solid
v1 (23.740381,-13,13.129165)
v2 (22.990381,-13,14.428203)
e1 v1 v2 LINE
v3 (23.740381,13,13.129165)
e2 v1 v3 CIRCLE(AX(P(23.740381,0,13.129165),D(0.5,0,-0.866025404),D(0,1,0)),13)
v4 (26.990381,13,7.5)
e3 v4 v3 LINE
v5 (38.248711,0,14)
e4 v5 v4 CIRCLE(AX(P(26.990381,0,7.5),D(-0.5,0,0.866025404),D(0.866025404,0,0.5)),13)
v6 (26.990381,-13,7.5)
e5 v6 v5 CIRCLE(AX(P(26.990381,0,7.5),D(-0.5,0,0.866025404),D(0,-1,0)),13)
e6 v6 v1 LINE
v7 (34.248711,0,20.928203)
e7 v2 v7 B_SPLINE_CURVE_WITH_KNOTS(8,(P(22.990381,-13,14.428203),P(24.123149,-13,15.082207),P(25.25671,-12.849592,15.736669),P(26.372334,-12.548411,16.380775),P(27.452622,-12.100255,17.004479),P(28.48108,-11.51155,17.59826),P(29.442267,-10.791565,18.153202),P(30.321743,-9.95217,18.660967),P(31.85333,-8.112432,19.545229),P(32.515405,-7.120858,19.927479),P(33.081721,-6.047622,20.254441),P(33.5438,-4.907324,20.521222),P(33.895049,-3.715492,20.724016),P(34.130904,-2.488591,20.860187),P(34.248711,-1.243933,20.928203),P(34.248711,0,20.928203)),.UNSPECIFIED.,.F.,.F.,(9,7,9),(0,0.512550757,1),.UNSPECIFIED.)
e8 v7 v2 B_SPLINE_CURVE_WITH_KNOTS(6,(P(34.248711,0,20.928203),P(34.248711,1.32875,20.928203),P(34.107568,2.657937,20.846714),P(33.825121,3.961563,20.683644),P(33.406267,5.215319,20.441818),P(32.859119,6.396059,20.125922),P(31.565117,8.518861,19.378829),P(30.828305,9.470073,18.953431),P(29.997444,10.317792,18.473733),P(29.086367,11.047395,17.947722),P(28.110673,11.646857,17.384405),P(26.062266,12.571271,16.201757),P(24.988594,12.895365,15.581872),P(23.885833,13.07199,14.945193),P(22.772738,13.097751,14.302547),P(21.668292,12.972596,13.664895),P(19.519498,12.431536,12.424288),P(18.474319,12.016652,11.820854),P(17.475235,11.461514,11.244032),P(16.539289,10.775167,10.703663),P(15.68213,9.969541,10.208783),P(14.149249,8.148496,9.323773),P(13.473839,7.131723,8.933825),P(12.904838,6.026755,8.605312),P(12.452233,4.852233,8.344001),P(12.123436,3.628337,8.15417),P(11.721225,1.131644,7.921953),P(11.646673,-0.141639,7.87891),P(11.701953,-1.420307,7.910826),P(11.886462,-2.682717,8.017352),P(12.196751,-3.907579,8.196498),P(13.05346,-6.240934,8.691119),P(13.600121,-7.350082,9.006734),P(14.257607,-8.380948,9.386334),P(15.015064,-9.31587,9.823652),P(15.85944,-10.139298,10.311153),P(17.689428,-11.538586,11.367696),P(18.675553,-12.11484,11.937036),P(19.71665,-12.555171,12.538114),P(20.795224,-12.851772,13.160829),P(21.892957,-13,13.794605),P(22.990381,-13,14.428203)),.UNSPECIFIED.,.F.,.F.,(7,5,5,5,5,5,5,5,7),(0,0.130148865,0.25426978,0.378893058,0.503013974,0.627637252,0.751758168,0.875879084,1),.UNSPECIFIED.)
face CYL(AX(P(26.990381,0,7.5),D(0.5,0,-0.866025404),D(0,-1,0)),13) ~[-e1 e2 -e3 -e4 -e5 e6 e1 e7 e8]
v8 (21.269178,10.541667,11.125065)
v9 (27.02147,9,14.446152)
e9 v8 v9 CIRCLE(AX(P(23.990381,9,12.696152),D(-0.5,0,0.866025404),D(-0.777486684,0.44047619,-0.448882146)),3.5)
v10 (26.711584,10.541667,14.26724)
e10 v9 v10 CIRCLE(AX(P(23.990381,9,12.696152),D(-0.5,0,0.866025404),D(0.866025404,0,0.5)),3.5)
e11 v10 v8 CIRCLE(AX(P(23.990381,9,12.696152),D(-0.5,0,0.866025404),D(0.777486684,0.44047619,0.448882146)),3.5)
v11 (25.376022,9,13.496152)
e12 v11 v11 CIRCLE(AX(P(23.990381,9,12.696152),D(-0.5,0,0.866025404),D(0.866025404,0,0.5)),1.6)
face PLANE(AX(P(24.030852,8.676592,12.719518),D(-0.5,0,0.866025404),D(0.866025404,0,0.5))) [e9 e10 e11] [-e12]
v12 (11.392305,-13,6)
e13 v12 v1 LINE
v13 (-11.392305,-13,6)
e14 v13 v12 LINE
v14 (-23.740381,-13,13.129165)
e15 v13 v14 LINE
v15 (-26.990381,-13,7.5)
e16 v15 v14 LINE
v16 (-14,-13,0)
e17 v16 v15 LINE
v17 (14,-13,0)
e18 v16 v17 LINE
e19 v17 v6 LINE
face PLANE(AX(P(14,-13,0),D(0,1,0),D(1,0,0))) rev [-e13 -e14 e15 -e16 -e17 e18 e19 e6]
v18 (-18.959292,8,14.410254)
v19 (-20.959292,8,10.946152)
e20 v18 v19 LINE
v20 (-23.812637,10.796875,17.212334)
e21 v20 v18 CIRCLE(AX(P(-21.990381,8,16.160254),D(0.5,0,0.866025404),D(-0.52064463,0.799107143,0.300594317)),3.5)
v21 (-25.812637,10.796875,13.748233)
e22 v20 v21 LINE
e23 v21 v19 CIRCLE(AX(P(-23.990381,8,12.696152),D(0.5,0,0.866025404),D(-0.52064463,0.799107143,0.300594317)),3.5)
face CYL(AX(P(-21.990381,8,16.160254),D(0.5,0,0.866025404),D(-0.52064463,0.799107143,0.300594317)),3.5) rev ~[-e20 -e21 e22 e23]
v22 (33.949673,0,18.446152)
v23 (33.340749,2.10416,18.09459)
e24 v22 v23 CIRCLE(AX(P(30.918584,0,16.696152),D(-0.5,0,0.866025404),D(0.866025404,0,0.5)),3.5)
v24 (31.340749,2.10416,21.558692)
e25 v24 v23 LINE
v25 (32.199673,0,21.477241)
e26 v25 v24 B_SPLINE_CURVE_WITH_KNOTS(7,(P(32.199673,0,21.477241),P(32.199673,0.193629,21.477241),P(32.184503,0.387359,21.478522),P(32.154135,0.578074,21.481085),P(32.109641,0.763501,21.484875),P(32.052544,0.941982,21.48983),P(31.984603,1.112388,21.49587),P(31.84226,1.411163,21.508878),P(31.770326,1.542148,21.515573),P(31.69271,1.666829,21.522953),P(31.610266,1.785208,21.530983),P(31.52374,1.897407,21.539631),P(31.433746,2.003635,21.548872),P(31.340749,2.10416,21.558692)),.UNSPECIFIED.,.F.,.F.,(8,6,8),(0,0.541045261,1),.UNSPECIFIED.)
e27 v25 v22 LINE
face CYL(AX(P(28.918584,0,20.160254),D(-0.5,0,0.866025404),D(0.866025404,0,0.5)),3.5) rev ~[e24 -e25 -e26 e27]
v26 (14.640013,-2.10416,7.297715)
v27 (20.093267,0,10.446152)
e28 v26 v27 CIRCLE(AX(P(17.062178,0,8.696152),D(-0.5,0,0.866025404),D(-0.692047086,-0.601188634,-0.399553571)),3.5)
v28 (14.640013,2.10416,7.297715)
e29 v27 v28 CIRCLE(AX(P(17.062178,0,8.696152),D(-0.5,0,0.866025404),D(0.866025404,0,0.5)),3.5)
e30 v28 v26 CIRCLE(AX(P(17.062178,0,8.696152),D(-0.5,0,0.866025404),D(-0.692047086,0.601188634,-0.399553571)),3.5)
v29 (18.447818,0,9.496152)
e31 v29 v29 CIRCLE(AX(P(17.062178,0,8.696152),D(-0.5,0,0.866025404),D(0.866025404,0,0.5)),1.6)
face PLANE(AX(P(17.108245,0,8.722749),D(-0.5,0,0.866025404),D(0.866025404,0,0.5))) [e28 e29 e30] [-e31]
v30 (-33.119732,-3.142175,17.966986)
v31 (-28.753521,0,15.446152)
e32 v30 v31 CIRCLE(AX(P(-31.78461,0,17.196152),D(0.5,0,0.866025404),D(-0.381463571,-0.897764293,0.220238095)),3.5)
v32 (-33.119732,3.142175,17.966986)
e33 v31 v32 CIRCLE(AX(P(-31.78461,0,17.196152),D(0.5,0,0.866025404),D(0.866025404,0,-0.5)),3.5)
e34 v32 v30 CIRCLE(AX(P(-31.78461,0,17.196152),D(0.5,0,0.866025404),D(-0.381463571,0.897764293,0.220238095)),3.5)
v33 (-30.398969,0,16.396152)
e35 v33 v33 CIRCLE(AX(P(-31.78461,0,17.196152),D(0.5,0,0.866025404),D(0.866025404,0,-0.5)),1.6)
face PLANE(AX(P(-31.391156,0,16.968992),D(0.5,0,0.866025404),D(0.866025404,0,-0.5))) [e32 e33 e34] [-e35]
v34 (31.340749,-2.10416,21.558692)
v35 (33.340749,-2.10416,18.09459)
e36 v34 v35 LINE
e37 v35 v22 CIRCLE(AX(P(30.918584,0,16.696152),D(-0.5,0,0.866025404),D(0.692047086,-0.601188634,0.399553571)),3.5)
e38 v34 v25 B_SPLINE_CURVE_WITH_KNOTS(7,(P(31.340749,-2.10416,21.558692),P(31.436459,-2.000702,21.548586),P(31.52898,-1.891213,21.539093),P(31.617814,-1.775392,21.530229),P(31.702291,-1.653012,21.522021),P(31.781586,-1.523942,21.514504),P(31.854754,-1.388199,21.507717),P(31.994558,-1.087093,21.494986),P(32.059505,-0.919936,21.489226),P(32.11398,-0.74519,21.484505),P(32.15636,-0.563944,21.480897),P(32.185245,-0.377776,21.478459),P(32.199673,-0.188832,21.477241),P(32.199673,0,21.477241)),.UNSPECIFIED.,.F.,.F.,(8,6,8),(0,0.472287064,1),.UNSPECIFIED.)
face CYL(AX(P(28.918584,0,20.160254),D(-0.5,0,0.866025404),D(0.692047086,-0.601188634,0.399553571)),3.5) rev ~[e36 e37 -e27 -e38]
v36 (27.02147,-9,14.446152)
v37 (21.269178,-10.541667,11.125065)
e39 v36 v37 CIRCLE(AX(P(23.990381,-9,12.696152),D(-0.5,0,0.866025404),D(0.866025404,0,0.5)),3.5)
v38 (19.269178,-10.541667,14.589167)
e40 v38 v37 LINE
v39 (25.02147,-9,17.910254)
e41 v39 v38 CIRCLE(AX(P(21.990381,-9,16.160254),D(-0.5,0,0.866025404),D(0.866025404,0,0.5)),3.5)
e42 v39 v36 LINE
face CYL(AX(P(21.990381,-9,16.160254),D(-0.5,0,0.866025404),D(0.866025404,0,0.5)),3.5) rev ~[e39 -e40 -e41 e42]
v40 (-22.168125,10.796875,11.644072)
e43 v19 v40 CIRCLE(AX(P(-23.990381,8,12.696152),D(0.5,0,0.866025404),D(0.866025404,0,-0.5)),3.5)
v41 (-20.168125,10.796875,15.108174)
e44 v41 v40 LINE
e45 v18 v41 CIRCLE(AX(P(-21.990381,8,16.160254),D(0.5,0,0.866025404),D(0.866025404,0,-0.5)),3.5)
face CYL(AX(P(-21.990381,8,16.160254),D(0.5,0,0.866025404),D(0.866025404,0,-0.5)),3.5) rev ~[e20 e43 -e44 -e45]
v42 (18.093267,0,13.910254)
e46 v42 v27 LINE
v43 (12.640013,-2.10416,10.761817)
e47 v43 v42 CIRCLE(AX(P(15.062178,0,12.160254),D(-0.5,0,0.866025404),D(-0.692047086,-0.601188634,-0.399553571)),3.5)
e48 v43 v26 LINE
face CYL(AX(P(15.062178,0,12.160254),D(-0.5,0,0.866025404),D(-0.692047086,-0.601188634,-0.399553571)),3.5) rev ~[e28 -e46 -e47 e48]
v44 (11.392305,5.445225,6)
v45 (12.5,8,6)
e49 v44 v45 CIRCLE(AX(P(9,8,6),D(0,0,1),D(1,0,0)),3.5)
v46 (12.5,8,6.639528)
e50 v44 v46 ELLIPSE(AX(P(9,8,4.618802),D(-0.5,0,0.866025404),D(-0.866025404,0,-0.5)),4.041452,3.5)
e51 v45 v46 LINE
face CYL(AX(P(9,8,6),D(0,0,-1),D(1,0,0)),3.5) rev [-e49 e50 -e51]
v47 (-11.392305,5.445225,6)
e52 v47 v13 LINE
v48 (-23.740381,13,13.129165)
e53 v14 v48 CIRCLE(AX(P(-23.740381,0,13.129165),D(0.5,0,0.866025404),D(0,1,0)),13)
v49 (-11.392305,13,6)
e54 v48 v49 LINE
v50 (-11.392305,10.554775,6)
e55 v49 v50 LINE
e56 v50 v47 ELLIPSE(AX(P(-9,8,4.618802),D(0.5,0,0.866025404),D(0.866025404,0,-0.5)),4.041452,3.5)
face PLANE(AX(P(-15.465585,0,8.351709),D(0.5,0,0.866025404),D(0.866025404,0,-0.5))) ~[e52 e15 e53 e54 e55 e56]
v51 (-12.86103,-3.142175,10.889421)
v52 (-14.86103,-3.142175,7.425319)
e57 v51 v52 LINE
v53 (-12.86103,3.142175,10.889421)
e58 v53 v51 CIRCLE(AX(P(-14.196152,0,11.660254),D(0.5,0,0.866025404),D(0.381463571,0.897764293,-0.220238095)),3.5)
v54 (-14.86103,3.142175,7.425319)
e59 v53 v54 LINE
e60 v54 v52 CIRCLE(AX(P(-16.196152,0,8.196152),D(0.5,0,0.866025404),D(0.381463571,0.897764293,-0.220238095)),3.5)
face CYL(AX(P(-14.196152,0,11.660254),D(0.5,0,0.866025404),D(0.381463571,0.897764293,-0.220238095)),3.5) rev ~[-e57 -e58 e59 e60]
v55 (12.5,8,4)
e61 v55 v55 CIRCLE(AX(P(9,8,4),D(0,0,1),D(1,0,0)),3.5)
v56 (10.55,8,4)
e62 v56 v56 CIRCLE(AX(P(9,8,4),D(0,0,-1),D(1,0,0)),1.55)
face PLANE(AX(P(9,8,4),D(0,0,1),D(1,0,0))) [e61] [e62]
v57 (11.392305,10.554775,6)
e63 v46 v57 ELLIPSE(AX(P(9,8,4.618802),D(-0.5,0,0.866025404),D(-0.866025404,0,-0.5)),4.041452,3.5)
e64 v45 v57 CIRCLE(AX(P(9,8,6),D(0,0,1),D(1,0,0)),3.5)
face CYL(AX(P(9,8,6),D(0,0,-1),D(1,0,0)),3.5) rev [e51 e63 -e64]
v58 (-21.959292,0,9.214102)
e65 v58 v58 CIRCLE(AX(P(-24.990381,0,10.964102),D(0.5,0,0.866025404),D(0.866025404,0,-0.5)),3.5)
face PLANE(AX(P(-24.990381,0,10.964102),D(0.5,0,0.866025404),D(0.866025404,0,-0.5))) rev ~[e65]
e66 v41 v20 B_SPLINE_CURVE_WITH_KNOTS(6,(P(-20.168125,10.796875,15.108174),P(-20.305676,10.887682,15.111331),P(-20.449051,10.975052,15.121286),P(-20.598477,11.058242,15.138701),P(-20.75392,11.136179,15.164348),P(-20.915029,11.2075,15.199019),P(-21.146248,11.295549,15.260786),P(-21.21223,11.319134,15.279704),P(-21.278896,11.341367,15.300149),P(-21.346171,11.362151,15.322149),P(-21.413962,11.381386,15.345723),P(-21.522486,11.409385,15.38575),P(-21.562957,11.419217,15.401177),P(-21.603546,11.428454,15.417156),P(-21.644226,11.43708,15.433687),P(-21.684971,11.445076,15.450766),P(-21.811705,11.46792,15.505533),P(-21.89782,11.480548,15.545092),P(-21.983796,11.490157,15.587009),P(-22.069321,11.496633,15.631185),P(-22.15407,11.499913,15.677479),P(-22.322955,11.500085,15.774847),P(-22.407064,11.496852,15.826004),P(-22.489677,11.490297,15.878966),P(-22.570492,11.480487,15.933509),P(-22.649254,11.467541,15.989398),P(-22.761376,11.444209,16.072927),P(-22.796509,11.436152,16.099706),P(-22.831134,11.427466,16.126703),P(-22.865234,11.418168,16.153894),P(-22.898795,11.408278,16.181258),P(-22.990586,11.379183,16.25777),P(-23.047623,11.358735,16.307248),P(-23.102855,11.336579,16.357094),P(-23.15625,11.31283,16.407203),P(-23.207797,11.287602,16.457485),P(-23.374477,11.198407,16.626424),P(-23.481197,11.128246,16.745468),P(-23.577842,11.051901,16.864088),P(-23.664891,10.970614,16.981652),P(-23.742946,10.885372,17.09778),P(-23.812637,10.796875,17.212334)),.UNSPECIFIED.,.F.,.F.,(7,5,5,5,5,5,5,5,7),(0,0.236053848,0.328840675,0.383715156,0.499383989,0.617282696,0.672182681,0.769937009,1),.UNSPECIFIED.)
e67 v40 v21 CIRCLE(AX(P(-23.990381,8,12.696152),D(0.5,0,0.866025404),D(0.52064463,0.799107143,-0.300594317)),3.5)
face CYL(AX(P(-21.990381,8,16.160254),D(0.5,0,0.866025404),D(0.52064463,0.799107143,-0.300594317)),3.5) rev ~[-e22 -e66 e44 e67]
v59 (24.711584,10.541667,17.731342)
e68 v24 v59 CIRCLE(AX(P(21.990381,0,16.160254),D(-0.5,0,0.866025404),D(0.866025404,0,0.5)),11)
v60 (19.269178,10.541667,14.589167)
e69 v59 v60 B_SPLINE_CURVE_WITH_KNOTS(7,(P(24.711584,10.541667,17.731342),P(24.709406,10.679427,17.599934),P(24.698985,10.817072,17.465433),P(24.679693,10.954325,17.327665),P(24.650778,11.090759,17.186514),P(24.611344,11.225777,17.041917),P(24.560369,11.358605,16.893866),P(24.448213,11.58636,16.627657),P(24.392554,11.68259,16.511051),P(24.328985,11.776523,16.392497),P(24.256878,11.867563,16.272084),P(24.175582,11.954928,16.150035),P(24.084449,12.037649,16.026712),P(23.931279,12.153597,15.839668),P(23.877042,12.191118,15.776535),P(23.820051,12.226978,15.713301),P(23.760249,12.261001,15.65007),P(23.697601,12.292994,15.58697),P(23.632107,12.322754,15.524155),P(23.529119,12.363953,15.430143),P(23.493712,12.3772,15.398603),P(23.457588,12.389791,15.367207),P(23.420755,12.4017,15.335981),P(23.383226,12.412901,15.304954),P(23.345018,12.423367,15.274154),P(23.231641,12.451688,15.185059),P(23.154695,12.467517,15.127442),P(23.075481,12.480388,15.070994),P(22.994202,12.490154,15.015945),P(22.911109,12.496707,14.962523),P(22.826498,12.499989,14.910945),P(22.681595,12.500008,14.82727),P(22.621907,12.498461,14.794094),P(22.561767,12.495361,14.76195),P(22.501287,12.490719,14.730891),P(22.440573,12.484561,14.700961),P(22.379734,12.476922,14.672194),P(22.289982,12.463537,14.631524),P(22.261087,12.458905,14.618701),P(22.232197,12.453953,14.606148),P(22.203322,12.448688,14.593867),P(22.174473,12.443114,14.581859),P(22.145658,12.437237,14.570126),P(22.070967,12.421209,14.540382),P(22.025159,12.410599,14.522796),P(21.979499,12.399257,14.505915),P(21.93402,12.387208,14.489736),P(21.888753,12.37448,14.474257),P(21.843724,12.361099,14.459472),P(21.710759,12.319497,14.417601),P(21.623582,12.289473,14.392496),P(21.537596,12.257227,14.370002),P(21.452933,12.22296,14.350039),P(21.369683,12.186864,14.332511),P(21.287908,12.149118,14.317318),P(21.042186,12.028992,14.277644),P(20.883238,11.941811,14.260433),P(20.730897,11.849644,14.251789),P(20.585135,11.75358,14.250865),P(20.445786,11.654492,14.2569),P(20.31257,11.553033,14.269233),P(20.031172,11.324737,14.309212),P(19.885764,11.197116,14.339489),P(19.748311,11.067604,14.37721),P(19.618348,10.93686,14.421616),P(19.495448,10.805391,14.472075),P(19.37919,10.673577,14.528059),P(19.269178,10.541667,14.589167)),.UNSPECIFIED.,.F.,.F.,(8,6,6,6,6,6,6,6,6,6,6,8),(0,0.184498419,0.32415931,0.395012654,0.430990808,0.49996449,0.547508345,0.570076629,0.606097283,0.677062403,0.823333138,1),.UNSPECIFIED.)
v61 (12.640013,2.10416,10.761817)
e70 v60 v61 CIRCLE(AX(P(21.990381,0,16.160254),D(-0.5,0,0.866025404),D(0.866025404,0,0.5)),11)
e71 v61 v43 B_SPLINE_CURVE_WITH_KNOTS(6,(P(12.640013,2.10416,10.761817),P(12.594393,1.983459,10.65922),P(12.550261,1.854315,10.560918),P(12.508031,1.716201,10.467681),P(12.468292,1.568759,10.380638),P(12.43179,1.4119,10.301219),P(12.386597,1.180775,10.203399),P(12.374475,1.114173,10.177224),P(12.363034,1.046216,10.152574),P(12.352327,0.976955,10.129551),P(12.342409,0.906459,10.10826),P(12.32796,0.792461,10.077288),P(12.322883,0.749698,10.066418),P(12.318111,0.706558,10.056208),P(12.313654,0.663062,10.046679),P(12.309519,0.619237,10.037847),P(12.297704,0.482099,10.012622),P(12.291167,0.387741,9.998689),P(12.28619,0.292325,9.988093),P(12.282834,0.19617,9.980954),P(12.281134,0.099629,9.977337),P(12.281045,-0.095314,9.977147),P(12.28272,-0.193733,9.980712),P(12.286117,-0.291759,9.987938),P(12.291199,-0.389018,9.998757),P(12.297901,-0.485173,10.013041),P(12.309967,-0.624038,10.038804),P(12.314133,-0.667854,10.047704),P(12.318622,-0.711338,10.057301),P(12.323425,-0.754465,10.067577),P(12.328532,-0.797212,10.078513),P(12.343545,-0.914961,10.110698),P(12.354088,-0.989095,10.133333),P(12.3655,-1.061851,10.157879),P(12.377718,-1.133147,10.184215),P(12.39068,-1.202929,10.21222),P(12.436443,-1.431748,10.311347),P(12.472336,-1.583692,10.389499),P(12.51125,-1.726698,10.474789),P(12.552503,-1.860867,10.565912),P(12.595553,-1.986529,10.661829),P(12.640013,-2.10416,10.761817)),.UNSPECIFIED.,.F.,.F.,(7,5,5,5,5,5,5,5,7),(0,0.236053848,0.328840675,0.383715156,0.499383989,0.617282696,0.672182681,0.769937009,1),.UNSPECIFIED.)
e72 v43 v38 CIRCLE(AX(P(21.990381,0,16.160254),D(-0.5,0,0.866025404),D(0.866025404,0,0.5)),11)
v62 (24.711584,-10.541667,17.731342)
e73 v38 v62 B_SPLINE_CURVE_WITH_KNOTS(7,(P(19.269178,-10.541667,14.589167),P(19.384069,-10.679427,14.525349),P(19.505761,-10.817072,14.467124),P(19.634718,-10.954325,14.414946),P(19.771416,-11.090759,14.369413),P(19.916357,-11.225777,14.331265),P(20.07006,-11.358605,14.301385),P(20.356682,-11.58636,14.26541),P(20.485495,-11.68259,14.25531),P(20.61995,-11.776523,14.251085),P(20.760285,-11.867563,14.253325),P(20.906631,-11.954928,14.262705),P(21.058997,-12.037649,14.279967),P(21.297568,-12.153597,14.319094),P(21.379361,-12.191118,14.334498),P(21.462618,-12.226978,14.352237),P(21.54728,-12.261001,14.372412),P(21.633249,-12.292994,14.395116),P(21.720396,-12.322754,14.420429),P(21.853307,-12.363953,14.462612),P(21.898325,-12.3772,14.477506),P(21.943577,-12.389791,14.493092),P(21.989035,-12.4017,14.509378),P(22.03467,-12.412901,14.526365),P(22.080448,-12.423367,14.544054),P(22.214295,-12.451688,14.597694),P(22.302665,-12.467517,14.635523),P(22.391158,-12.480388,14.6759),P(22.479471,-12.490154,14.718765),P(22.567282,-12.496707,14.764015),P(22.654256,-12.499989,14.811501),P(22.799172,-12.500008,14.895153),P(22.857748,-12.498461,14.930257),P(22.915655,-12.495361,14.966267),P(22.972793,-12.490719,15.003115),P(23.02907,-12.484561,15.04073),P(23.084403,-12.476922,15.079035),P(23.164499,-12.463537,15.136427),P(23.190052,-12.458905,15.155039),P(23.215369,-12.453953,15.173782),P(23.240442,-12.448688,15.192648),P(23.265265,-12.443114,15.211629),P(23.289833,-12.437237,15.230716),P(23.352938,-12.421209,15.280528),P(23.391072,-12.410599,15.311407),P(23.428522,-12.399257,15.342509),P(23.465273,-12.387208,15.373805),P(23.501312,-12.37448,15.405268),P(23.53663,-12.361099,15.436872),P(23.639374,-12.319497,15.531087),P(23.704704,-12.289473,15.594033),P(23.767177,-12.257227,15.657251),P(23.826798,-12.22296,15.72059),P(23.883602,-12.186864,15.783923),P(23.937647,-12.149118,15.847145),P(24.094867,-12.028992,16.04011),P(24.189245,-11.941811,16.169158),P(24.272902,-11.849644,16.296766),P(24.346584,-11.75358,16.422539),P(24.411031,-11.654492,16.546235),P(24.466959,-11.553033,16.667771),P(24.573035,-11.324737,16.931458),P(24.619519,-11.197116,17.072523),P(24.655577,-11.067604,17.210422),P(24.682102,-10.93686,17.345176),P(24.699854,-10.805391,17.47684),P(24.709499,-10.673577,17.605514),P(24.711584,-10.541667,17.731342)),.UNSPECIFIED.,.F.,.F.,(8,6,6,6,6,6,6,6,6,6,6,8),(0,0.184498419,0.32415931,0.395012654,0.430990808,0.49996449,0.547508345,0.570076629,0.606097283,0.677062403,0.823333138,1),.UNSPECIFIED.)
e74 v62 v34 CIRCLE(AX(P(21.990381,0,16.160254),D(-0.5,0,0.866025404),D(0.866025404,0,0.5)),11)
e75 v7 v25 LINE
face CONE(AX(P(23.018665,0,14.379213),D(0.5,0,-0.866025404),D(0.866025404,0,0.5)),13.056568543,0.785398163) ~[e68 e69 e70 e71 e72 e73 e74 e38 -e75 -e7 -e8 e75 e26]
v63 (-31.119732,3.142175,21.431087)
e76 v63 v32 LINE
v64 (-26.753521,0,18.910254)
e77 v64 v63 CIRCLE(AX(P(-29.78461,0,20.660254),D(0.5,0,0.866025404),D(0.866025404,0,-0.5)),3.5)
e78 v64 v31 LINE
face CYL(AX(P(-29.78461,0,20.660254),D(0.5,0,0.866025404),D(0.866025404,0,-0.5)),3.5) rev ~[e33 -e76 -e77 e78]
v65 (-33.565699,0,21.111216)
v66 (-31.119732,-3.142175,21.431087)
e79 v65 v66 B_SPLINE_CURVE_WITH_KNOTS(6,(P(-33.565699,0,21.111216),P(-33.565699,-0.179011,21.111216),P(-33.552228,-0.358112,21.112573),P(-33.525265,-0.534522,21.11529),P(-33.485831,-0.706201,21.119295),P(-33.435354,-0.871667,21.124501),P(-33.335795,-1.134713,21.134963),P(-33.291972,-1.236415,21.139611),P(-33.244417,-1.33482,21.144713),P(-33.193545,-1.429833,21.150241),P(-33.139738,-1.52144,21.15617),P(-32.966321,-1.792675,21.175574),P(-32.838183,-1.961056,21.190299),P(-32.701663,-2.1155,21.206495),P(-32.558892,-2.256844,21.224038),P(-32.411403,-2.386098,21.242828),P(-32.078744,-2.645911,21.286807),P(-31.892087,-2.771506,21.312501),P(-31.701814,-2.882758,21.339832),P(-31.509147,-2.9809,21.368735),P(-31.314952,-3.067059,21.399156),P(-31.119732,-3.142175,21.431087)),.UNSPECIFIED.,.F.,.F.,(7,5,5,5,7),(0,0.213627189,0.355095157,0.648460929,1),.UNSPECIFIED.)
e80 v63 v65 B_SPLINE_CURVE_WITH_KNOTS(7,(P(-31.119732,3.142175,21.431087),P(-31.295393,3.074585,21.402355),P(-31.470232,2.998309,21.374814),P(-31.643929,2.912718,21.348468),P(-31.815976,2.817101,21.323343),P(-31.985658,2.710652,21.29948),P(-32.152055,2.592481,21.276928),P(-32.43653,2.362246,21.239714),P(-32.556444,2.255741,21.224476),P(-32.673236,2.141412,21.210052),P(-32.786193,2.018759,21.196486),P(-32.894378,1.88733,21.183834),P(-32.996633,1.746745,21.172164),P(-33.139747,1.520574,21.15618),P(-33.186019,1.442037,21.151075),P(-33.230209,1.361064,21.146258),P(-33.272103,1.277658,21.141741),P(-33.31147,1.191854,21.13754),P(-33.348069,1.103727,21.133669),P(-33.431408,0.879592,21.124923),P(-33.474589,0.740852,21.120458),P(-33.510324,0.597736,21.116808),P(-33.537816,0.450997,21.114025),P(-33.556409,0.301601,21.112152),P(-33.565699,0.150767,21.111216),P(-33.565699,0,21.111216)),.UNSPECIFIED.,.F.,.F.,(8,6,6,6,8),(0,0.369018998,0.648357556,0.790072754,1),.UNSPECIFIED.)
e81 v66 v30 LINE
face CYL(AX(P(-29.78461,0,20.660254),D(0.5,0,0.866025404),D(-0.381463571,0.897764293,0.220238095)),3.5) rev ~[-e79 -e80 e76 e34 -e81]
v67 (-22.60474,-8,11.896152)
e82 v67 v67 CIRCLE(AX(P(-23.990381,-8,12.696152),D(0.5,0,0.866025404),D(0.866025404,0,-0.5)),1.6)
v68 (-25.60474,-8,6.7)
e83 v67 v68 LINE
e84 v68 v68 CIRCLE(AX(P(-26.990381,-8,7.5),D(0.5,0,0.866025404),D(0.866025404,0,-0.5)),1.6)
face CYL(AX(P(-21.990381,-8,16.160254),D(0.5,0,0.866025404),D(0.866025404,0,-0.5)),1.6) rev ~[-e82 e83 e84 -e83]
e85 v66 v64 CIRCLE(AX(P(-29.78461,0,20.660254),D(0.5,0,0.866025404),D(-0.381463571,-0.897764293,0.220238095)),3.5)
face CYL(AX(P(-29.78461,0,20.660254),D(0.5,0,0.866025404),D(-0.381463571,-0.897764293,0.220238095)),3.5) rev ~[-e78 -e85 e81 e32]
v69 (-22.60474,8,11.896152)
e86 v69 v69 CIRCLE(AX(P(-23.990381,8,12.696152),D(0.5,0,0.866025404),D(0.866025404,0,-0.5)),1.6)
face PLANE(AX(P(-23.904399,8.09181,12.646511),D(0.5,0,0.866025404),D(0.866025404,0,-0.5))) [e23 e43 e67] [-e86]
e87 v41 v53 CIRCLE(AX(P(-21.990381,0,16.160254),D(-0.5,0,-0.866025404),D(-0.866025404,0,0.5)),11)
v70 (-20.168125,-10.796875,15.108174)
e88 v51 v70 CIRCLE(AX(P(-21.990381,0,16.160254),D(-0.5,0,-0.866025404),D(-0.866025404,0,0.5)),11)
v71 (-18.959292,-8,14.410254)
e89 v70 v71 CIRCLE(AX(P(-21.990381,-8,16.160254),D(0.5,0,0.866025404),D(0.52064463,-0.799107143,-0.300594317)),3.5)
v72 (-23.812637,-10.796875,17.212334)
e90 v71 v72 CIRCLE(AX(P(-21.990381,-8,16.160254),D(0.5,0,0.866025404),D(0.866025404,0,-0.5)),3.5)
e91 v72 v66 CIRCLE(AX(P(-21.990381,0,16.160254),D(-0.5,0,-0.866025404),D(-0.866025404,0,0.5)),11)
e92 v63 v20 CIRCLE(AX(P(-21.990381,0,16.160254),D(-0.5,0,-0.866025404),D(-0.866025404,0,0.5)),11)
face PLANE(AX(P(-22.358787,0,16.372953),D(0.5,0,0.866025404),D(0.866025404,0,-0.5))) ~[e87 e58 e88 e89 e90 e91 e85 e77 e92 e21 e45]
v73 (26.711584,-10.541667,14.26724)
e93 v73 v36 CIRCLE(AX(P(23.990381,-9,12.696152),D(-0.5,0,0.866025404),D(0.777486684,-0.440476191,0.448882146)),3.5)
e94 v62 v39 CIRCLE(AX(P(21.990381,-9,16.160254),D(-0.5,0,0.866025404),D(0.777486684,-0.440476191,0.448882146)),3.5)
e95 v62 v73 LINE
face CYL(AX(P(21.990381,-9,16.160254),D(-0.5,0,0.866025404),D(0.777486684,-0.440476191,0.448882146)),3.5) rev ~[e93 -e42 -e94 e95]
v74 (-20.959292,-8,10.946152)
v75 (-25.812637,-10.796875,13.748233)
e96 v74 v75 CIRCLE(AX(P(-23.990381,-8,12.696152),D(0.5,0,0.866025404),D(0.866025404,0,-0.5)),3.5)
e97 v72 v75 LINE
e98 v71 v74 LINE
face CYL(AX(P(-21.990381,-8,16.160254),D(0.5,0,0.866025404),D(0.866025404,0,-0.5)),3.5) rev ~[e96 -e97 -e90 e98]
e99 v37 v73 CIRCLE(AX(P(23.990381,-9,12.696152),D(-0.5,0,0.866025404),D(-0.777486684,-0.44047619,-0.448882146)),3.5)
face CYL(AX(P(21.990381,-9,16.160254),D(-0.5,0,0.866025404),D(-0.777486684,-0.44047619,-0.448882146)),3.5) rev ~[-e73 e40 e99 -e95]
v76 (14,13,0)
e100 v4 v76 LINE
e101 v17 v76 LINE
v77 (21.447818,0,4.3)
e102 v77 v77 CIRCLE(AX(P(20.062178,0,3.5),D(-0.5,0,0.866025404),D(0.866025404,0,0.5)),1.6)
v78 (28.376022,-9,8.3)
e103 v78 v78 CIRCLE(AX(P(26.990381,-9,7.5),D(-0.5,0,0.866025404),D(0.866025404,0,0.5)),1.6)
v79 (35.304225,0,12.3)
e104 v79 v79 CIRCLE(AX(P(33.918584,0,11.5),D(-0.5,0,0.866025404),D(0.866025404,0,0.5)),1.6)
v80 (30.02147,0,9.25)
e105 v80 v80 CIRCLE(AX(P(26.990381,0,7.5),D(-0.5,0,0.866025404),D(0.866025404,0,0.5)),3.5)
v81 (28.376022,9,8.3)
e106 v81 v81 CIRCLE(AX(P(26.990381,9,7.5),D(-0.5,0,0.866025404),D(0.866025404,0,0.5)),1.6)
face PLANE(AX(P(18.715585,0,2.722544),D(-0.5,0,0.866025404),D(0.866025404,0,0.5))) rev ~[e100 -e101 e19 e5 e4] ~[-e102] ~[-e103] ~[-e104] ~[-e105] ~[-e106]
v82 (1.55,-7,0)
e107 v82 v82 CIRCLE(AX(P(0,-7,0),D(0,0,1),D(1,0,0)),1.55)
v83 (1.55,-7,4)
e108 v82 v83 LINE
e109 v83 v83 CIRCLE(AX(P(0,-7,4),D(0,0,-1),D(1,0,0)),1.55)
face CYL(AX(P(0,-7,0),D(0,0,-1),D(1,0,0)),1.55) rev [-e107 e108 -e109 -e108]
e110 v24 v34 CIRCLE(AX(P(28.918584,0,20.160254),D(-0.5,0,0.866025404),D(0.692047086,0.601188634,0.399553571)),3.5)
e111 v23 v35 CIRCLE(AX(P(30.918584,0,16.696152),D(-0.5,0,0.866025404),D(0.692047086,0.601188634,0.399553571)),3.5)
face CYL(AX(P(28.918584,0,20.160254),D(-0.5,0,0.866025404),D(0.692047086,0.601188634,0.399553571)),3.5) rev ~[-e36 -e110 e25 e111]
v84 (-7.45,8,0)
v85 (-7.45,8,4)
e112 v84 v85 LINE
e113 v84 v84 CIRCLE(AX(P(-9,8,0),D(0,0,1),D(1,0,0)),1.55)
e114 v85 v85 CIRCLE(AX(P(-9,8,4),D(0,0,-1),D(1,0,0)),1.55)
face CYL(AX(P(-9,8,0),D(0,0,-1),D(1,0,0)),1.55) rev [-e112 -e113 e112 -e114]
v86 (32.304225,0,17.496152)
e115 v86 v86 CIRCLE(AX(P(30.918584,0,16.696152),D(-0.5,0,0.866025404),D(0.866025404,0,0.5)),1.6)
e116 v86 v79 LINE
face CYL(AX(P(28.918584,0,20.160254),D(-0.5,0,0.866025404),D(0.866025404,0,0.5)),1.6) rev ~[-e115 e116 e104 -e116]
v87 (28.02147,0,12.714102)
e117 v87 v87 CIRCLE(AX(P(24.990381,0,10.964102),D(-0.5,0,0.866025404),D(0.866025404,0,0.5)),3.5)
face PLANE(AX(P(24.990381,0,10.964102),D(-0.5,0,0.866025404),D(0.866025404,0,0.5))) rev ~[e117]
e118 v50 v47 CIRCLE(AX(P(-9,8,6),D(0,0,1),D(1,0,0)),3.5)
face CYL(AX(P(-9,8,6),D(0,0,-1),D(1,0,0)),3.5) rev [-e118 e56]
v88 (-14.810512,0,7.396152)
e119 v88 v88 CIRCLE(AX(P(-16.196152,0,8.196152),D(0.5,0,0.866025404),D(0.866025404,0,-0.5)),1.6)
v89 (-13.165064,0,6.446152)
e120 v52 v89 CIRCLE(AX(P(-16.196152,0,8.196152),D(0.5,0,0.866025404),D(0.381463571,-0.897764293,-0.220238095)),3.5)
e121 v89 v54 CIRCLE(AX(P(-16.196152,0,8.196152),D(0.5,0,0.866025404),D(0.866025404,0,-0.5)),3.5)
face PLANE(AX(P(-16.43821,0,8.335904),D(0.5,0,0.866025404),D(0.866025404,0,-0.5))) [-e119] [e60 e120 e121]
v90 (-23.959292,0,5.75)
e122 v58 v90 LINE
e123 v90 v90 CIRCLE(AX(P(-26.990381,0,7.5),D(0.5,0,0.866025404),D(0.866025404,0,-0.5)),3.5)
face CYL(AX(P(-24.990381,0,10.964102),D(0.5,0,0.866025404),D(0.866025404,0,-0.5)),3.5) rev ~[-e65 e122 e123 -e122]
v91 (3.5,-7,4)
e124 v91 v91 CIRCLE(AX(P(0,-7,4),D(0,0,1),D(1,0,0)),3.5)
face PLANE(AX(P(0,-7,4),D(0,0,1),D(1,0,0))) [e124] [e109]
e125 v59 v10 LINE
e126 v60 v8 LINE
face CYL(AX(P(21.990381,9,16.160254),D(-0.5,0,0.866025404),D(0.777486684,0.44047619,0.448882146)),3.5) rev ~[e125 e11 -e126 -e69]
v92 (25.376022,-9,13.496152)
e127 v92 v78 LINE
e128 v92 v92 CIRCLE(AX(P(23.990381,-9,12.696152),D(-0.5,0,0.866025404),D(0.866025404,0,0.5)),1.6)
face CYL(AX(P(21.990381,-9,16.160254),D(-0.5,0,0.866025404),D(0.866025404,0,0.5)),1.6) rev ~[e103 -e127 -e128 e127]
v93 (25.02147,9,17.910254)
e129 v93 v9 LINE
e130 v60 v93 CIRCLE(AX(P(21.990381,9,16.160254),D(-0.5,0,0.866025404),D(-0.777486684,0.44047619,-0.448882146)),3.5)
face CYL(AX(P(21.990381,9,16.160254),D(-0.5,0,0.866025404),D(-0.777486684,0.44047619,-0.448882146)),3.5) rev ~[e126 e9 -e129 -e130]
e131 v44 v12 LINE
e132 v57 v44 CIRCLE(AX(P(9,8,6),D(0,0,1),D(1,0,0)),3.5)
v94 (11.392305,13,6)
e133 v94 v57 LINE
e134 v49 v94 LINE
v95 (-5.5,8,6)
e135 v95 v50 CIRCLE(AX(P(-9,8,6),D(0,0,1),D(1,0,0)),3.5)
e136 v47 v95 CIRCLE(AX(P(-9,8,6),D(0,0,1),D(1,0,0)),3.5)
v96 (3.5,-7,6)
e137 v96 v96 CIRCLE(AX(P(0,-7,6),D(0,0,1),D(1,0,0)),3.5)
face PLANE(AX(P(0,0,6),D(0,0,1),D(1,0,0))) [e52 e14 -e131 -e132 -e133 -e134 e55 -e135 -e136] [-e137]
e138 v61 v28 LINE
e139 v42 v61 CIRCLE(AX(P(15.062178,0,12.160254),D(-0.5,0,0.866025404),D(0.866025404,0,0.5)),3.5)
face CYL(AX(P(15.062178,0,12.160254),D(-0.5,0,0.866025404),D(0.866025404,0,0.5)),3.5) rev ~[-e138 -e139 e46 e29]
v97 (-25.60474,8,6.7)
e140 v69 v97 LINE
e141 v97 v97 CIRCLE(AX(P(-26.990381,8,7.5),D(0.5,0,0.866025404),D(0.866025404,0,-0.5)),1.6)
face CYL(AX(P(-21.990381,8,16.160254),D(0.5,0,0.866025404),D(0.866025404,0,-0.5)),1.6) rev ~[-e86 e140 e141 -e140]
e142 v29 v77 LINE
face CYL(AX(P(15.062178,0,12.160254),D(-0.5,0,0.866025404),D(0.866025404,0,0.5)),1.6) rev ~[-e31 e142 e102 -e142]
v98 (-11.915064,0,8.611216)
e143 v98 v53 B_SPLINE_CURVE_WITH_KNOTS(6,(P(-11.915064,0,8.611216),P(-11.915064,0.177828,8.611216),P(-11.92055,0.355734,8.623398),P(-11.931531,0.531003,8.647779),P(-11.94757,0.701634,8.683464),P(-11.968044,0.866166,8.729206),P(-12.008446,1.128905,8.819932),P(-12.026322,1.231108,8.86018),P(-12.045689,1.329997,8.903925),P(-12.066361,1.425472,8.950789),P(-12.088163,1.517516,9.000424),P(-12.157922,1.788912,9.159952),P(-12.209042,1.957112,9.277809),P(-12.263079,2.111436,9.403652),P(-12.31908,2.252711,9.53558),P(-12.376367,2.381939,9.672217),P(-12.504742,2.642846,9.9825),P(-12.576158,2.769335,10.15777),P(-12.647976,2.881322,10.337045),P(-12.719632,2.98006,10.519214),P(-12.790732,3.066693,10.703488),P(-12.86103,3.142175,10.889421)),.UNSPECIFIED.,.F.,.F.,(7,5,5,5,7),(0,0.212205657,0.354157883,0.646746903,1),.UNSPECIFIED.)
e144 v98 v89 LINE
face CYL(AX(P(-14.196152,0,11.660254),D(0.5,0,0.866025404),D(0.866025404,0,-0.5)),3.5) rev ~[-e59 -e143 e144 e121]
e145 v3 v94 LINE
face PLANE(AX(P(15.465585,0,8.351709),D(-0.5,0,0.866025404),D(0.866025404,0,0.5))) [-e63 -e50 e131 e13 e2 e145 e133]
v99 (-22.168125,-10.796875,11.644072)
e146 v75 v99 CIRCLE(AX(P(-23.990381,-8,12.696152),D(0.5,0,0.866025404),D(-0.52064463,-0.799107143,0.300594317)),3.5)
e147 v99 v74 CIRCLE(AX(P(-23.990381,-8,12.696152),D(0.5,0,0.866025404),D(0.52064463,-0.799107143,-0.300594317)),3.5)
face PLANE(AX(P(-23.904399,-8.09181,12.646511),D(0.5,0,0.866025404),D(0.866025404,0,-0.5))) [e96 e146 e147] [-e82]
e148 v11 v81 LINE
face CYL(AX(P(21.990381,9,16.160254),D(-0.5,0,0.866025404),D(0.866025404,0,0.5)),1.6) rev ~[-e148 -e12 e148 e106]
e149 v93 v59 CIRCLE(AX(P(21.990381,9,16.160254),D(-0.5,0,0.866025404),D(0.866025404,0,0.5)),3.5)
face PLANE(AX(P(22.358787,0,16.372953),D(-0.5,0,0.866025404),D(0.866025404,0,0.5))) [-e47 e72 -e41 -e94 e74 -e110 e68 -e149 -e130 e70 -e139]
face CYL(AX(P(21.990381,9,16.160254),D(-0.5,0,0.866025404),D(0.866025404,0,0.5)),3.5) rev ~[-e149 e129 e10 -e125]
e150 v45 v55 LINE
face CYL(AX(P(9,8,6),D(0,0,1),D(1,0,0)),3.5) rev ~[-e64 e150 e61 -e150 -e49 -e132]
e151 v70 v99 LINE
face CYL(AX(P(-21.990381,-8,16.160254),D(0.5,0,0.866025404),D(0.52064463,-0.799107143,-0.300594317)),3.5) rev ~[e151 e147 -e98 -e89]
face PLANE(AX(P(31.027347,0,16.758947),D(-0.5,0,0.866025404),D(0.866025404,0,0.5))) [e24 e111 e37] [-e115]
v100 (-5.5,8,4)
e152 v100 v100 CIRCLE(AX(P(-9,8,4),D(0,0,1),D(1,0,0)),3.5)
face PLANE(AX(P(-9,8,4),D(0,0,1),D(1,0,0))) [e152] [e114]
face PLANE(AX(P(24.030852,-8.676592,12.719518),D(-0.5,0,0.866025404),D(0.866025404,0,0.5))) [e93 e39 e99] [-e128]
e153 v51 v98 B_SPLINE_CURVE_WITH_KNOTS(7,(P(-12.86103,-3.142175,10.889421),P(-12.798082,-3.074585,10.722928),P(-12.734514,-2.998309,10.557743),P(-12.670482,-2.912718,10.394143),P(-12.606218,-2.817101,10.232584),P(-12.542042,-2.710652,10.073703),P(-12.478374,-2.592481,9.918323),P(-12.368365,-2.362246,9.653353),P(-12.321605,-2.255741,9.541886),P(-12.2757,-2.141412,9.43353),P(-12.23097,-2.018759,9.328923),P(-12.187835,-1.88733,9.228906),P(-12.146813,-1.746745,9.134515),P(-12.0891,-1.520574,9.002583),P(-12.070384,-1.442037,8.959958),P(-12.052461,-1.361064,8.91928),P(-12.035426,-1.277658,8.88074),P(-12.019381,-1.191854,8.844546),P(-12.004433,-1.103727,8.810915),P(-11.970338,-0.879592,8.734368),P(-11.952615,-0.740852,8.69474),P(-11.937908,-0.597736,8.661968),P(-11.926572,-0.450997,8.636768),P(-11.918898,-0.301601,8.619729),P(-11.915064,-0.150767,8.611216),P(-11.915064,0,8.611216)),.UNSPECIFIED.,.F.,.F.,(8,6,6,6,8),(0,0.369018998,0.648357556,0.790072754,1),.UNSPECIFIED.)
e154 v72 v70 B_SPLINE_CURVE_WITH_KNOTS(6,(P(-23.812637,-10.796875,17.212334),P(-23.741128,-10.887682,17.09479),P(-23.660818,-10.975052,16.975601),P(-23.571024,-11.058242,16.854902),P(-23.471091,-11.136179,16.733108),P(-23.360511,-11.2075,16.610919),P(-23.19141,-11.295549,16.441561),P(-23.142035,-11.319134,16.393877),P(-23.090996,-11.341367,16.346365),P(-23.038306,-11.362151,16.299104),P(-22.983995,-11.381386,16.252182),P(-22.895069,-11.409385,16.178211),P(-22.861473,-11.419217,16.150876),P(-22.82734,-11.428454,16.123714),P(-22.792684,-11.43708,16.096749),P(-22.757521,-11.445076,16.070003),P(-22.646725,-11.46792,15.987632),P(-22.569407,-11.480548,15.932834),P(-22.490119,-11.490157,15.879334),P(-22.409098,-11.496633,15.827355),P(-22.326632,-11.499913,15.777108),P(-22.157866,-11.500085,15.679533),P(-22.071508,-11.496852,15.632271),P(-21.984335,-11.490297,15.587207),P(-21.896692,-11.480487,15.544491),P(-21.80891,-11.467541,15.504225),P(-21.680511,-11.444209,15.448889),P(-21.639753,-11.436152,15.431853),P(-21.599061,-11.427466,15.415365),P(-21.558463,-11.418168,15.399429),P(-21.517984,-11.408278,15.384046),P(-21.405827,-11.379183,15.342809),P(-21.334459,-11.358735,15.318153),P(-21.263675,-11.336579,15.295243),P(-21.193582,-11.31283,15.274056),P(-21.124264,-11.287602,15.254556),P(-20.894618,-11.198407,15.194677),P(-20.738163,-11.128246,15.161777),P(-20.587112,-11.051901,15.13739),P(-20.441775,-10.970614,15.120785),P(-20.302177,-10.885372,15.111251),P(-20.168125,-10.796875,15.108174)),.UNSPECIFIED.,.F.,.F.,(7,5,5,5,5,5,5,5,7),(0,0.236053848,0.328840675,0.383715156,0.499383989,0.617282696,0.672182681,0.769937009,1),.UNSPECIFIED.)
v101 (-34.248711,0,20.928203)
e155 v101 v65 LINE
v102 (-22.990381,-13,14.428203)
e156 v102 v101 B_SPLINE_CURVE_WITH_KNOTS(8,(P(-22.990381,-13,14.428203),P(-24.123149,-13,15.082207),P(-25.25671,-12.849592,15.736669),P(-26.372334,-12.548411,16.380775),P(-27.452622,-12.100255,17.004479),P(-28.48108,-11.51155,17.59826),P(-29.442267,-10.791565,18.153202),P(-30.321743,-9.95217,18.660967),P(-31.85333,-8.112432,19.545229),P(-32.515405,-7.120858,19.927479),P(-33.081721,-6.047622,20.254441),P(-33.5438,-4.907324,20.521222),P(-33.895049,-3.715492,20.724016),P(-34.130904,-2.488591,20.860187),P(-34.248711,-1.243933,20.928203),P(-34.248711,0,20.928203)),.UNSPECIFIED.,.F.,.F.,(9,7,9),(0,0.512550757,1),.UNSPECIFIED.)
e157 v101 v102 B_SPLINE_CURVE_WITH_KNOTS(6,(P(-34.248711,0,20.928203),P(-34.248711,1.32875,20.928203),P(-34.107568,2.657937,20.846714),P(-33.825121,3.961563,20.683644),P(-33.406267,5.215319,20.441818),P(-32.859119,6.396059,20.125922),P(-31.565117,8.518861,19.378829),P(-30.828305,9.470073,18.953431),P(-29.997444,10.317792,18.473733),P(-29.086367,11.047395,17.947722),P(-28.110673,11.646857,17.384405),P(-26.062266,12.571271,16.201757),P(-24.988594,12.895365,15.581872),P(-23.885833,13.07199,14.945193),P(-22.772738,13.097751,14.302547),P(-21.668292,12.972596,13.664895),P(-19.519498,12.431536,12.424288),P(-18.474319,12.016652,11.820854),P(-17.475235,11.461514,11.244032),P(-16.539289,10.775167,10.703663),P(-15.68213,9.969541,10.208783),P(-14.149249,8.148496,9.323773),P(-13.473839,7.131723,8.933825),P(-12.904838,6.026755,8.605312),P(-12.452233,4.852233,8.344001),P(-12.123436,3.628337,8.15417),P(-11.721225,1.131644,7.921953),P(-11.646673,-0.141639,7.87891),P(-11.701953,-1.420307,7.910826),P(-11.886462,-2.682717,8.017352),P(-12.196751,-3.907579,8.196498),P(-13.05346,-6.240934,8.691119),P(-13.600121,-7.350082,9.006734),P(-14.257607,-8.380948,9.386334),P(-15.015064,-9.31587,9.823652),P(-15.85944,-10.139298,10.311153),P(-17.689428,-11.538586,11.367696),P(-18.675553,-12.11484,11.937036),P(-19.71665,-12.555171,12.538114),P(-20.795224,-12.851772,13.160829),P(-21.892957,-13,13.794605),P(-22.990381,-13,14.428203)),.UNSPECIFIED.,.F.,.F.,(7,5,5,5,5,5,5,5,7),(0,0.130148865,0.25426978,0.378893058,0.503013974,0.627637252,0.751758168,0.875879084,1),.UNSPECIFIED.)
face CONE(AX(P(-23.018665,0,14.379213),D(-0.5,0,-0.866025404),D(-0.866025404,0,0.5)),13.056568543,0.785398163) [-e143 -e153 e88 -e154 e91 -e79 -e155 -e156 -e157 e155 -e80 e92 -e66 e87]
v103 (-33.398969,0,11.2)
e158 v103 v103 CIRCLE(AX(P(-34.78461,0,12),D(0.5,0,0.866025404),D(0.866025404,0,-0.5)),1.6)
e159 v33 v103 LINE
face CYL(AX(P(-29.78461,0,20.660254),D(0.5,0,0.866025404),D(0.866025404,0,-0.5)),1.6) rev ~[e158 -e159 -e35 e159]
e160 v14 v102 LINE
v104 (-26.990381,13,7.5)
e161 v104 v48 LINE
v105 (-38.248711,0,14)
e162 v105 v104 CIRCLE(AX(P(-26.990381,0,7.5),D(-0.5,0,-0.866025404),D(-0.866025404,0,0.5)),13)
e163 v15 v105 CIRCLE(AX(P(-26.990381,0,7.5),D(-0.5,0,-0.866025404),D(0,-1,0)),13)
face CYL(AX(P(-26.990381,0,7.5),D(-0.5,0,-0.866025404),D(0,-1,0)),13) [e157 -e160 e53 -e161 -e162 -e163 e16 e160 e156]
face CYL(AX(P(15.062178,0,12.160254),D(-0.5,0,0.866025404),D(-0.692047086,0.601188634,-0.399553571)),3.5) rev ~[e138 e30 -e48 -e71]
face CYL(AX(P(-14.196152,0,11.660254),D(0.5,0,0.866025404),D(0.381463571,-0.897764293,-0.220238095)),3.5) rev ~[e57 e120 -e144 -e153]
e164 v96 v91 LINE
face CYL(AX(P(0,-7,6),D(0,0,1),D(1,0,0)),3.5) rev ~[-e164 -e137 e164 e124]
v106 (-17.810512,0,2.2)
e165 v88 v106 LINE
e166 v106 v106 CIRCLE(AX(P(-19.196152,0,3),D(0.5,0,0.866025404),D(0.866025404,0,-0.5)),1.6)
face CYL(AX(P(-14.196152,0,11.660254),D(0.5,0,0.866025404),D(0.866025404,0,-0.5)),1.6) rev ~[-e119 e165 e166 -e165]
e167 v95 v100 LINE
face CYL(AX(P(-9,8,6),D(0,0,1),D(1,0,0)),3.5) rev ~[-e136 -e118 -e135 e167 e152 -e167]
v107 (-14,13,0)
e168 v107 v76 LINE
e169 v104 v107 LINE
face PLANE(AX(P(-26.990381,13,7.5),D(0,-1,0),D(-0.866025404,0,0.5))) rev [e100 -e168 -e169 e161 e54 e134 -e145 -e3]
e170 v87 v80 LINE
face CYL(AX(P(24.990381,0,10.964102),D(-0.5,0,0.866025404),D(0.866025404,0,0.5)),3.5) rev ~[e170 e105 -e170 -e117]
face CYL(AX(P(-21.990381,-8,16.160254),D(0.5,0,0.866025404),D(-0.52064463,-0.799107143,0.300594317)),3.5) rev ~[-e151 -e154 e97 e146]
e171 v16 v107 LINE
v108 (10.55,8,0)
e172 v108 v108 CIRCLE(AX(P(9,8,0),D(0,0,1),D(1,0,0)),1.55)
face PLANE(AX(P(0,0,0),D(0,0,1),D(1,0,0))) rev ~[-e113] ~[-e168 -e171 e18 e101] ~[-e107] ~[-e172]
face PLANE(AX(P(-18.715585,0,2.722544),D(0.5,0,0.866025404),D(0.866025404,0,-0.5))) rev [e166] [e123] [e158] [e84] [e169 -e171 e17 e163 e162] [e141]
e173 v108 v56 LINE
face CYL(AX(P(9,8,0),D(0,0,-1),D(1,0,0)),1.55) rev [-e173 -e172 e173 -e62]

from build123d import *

# Parameters (mm, degrees)
F0_W      = 28
F0_H      = 26
F0_R      = 1.55
F1_DEPTH  = 6
F5_DEPTH  = 6.5
F6_DEPTH  = 10
F9_R      = 1.6
F10_DEPTH = 4
F11_DEPTH = 25
F12_START = -6
F9_R_2    = 3.5
F12_DEPTH = 19
F13_R     = 1.6
F14_DEPTH = 4
F15_DEPTH = 25
F16_START = -6
F13_R_2   = 3.5
F16_DEPTH = 19
F17_R     = 3.5
F18_DEPTH = 2
F19_DEPTH = 25


# Not quite as in the source:
# - a fillet or chamfer that OpenCascade refuses, or shapes differently, is made with other operations: its cross-section is extruded or revolved along the edge and cut away or added


with BuildPart() as f1:
    # F0 (on Top) → F1 (new body)
    with BuildSketch(Plane.XY):
        Rectangle(F0_W, F0_H)
        with Locations((0, -7)):
            Circle(F0_R, mode=Mode.SUBTRACT)
        with Locations((-9, 8)):
            Circle(F0_R, mode=Mode.SUBTRACT)
        with Locations((9, 8)):
            Circle(F0_R, mode=Mode.SUBTRACT)
    extrude(amount=F1_DEPTH)

    # F4 (on face) → F5 (join)
    with BuildSketch(Plane(origin=(3.5, 0, -6.0621778265), x_dir=(0.8660254038, 0, 0.5), z_dir=(-0.5, 0, 0.8660254038))):
        with BuildLine():
            Line((12.124355653, -13), (27.124355653, -13))
            ThreePointArc((27.124355653, -13), (14.124355653, 0), (27.124355653, 13))
            Line((27.124355653, 13), (12.124355653, 13))
            Line((12.124355653, 13), (12.124355653, -13))
        make_face()
        with BuildLine():
            ThreePointArc((27.124355653, 13), (14.124355653, 0), (27.124355653, -13))
            ThreePointArc((27.124355653, -13), (36.3167438084, -9.1923881554), (40.124355653, 0))
            ThreePointArc((40.124355653, 0), (36.3167438084, 9.1923881554), (27.124355653, 13))
        make_face()
    extrude(amount=F5_DEPTH)

    # F4 (on face) → F6 (join)
    with BuildSketch(Plane(origin=(3.5, 0, -6.0621778265), x_dir=(0.8660254038, 0, 0.5), z_dir=(-0.5, 0, 0.8660254038))):
        with BuildLine():
            ThreePointArc((27.124355653, 13), (14.124355653, 0), (27.124355653, -13))
            ThreePointArc((27.124355653, -13), (36.3167438084, -9.1923881554), (40.124355653, 0))
            ThreePointArc((40.124355653, 0), (36.3167438084, 9.1923881554), (27.124355653, 13))
        make_face()
    extrude(amount=F6_DEPTH)

    # F7: chamfer of 2 on 1 edges, made by hand

    # F7_s1 → F7_t2 (revolve, cut)
    with BuildSketch(Plane.XZ):
        with BuildLine():
            Line((34.3259853721, 20.9074977067), (31.4393864323, 21.6809595615))
            Line((31.4393864323, 21.6809595615), (31.4193864323, 21.7156005776))
            ThreePointArc((31.4193864323, 21.7156005776), (32.3381910048, 22.1807529184), (33.228711306, 22.694895054))
            Line((33.228711306, 22.694895054), (33.2833523221, 22.6802540378))
            ThreePointArc((33.2833523221, 22.6802540378), (33.7974944577, 21.7897337366), (34.3606263882, 20.9274977067))
            Line((34.3606263882, 20.9274977067), (34.3259853721, 20.9074977067))
        make_face()
    revolve(axis=Axis((21.9903810568, 0, 16.1602540378), (0.5, 0, -0.8660254038)), mode=Mode.SUBTRACT)

    # F8: F1 across plane


with BuildPart() as f1_1:
    add(f1.part)
    add(f1.part.mirror(Plane.YZ))

    # F9 (on face) → F10 (cut)
    with BuildSketch(Plane(origin=(-1.5, 0, 2.5980762114), x_dir=(0.8660254038, 0, 0.5), z_dir=(-0.5, 0, 0.8660254038))):
        with BuildLine():
            ThreePointArc((23.9821806278, -10.5416666667), (27.124355653, -11.0000000001), (30.2665306781, -10.5416666667))
            ThreePointArc((30.2665306781, -10.5416666667), (30.5337260192, -9.7913240209), (30.624355653, -9))
            ThreePointArc((30.624355653, -9), (26.3330316321, -5.5906296338), (23.9821806278, -10.5416666667))
        make_face()
        with Locations((27.124355653, -9)):
            Circle(F9_R, mode=Mode.SUBTRACT)
        with BuildLine():
            ThreePointArc((23.9821806278, -10.5416666667), (27.124355653, -12.5), (30.2665306781, -10.5416666667))
            ThreePointArc((30.2665306781, -10.5416666667), (27.124355653, -11.0000000001), (23.9821806278, -10.5416666667))
        make_face()
        with BuildLine():
            ThreePointArc((22.624355653, 0), (20.2336206122, 3.3195679312), (16.3274806529, 2.1041602206))
            ThreePointArc((16.3274806529, 2.1041602206), (16.1243556529, 0), (16.3274806529, -2.1041602206))
            ThreePointArc((16.3274806529, -2.1041602206), (20.2336206122, -3.3195679312), (22.624355653, 0))
        make_face()
        with Locations((19.124355653, 0)):
            Circle(F9_R, mode=Mode.SUBTRACT)
        with BuildLine():
            ThreePointArc((16.3274806529, -2.1041602206), (16.1243556529, 0), (16.3274806529, 2.1041602206))
            ThreePointArc((16.3274806529, 2.1041602206), (15.624355653, 0), (16.3274806529, -2.1041602206))
        make_face()
        with BuildLine():
            ThreePointArc((30.624355653, 9), (30.5337260192, 9.7913240209), (30.2665306781, 10.5416666667))
            ThreePointArc((30.2665306781, 10.5416666667), (27.124355653, 11.0000000001), (23.9821806278, 10.5416666667))
            ThreePointArc((23.9821806278, 10.5416666667), (26.3330316321, 5.5906296338), (30.624355653, 9))
        make_face()
        with Locations((27.124355653, 9)):
            Circle(F9_R, mode=Mode.SUBTRACT)
        with BuildLine():
            ThreePointArc((23.9821806278, 10.5416666667), (27.124355653, 11.0000000001), (30.2665306781, 10.5416666667))
            ThreePointArc((30.2665306781, 10.5416666667), (27.124355653, 12.5), (23.9821806278, 10.5416666667))
        make_face()
        with BuildLine():
            ThreePointArc((38.124355653, 0), (38.0734566435, 1.0569709078), (37.9212306531, 2.1041602206))
            ThreePointArc((37.9212306531, 2.1041602206), (31.624355653, 0), (37.9212306531, -2.1041602206))
            ThreePointArc((37.9212306531, -2.1041602206), (38.0734566435, -1.0569709078), (38.124355653, 0))
        make_face()
        with Locations((35.124355653, 0)):
            Circle(F9_R, mode=Mode.SUBTRACT)
        with BuildLine():
            ThreePointArc((37.9212306531, -2.1041602206), (38.4439235842, -1.1092649593), (38.624355653, 0))
            ThreePointArc((38.624355653, 0), (38.4439235842, 1.1092649593), (37.9212306531, 2.1041602206))
            ThreePointArc((37.9212306531, 2.1041602206), (38.0734566435, 1.0569709078), (38.124355653, 0))
            ThreePointArc((38.124355653, 0), (38.0734566435, -1.0569709078), (37.9212306531, -2.1041602206))
        make_face()
        with Locations((35.124355653, 0)):
            Circle(F9_R)
        with Locations((19.124355653, 0)):
            Circle(F9_R)
        with Locations((27.124355653, 9)):
            Circle(F9_R)
        with Locations((27.124355653, -9)):
            Circle(F9_R)
    extrude(amount=-F10_DEPTH, mode=Mode.SUBTRACT)

    # F9 (on face) → F11 (cut)
    with BuildSketch(Plane(origin=(-1.5, 0, 2.5980762114), x_dir=(0.8660254038, 0, 0.5), z_dir=(-0.5, 0, 0.8660254038))):
        with Locations((35.124355653, 0)):
            Circle(F9_R)
        with Locations((19.124355653, 0)):
            Circle(F9_R)
        with Locations((27.124355653, -9)):
            Circle(F9_R)
        with Locations((27.124355653, 9)):
            Circle(F9_R)
    extrude(amount=-F11_DEPTH, mode=Mode.SUBTRACT)

    # F9 (on face) → F12 (cut)
    with BuildSketch(Plane(origin=(-1.5, 0, 2.5980762114), x_dir=(0.8660254038, 0, 0.5), z_dir=(-0.5, 0, 0.8660254038)).offset(F12_START)):
        with Locations((27.124355653, 0)):
            Circle(F9_R_2)
    extrude(amount=-F12_DEPTH, mode=Mode.SUBTRACT)

    # F13 (on face) → F14 (cut)
    with BuildSketch(Plane(origin=(1.5, 0, 2.5980762114), x_dir=(0.8660254038, 0, -0.5), z_dir=(0.5, 0, 0.8660254038))):
        with BuildLine():
            ThreePointArc((-25.0201954324, -10.7968750001), (-23.9926978834, -9.56292022), (-23.624355653, -8))
            ThreePointArc((-23.624355653, -8), (-28.687275873, -4.8683422304), (-29.2285158736, -10.7968750001))
            ThreePointArc((-29.2285158736, -10.7968750001), (-27.124355653, -11.0000000001), (-25.0201954324, -10.7968750001))
        make_face()
        with Locations((-27.124355653, -8)):
            Circle(F13_R, mode=Mode.SUBTRACT)
        with BuildLine():
            ThreePointArc((-25.0201954324, 10.7968750001), (-27.124355653, 11.0000000001), (-29.2285158736, 10.7968750001))
            ThreePointArc((-29.2285158736, 10.7968750001), (-28.687275873, 4.8683422304), (-23.624355653, 8))
            ThreePointArc((-23.624355653, 8), (-23.9926978834, 9.56292022), (-25.0201954324, 10.7968750001))
        make_face()
        with Locations((-27.124355653, 8)):
            Circle(F13_R, mode=Mode.SUBTRACT)
        with BuildLine():
            ThreePointArc((-37.6660223197, 3.1421750251), (-38.124355653, 0), (-37.6660223197, -3.1421750251))
            ThreePointArc((-37.6660223197, -3.1421750251), (-34.2731173287, -2.9703394868), (-32.624355653, 0))
            ThreePointArc((-32.624355653, 0), (-34.2731173287, 2.9703394868), (-37.6660223197, 3.1421750251))
        make_face()
        with Locations((-36.124355653, 0)):
            Circle(F13_R, mode=Mode.SUBTRACT)
        with BuildLine():
            ThreePointArc((-16.5826889862, 3.1421750251), (-21.624355653, 0), (-16.5826889862, -3.1421750251))
            ThreePointArc((-16.5826889862, -3.1421750251), (-16.2395420731, -1.5877132403), (-16.1243556529, 0))
            ThreePointArc((-16.1243556529, 0), (-16.2395420731, 1.5877132403), (-16.5826889862, 3.1421750251))
        make_face()
        with Locations((-18.124355653, 0)):
            Circle(F13_R, mode=Mode.SUBTRACT)
        with Locations((-36.124355653, 0)):
            Circle(F13_R)
        with Locations((-18.124355653, 0)):
            Circle(F13_R)
        with Locations((-27.124355653, -8)):
            Circle(F13_R)
        with Locations((-27.124355653, 8)):
            Circle(F13_R)
        with BuildLine():
            ThreePointArc((-37.6660223197, 3.1421750251), (-39.624355653, 0), (-37.6660223197, -3.1421750251))
            ThreePointArc((-37.6660223197, -3.1421750251), (-38.124355653, 0), (-37.6660223197, 3.1421750251))
        make_face()
        with BuildLine():
            ThreePointArc((-16.1243556529, 0), (-16.2395420731, -1.5877132403), (-16.5826889862, -3.1421750251))
            ThreePointArc((-16.5826889862, -3.1421750251), (-15.1540161662, -1.8512383243), (-14.624355653, 0))
            ThreePointArc((-14.624355653, 0), (-15.1540161662, 1.8512383243), (-16.5826889862, 3.1421750251))
            ThreePointArc((-16.5826889862, 3.1421750251), (-16.2395420731, 1.5877132403), (-16.1243556529, 0))
        make_face()
        with BuildLine():
            ThreePointArc((-25.0201954324, -10.7968750001), (-27.124355653, -11.0000000001), (-29.2285158736, -10.7968750001))
            ThreePointArc((-29.2285158736, -10.7968750001), (-27.124355653, -11.5), (-25.0201954324, -10.7968750001))
        make_face()
        with BuildLine():
            ThreePointArc((-25.0201954324, 10.7968750001), (-27.124355653, 11.5), (-29.2285158736, 10.7968750001))
            ThreePointArc((-29.2285158736, 10.7968750001), (-27.124355653, 11.0000000001), (-25.0201954324, 10.7968750001))
        make_face()
    extrude(amount=-F14_DEPTH, mode=Mode.SUBTRACT)

    # F13 (on face) → F15 (cut)
    with BuildSketch(Plane(origin=(1.5, 0, 2.5980762114), x_dir=(0.8660254038, 0, -0.5), z_dir=(0.5, 0, 0.8660254038))):
        with Locations((-18.124355653, 0)):
            Circle(F13_R)
        with Locations((-27.124355653, -8)):
            Circle(F13_R)
        with Locations((-36.124355653, 0)):
            Circle(F13_R)
        with Locations((-27.124355653, 8)):
            Circle(F13_R)
    extrude(amount=-F15_DEPTH, mode=Mode.SUBTRACT)

    # F13 (on face) → F16 (cut)
    with BuildSketch(Plane(origin=(1.5, 0, 2.5980762114), x_dir=(0.8660254038, 0, -0.5), z_dir=(0.5, 0, 0.8660254038)).offset(F16_START)):
        with Locations((-27.124355653, 0)):
            Circle(F13_R_2)
    extrude(amount=-F16_DEPTH, mode=Mode.SUBTRACT)

    # F17 (on face) → F18 (cut)
    with BuildSketch(Plane.XY.offset(6)):
        with Locations((-9, 8)):
            Circle(F17_R)
        with Locations((9, 8)):
            Circle(F17_R)
        with Locations((0, -7)):
            Circle(F17_R)
    extrude(amount=-F18_DEPTH, mode=Mode.SUBTRACT)

    # F17 (on face) → F19 (cut)
    with BuildSketch(Plane.XY.offset(6)):
        with Locations((-9, 8)):
            Circle(F17_R)
        with Locations((9, 8)):
            Circle(F17_R)
        with Locations((0, -7)):
            Circle(F17_R)
    extrude(amount=F19_DEPTH, mode=Mode.SUBTRACT)


solid = f1_1.part
